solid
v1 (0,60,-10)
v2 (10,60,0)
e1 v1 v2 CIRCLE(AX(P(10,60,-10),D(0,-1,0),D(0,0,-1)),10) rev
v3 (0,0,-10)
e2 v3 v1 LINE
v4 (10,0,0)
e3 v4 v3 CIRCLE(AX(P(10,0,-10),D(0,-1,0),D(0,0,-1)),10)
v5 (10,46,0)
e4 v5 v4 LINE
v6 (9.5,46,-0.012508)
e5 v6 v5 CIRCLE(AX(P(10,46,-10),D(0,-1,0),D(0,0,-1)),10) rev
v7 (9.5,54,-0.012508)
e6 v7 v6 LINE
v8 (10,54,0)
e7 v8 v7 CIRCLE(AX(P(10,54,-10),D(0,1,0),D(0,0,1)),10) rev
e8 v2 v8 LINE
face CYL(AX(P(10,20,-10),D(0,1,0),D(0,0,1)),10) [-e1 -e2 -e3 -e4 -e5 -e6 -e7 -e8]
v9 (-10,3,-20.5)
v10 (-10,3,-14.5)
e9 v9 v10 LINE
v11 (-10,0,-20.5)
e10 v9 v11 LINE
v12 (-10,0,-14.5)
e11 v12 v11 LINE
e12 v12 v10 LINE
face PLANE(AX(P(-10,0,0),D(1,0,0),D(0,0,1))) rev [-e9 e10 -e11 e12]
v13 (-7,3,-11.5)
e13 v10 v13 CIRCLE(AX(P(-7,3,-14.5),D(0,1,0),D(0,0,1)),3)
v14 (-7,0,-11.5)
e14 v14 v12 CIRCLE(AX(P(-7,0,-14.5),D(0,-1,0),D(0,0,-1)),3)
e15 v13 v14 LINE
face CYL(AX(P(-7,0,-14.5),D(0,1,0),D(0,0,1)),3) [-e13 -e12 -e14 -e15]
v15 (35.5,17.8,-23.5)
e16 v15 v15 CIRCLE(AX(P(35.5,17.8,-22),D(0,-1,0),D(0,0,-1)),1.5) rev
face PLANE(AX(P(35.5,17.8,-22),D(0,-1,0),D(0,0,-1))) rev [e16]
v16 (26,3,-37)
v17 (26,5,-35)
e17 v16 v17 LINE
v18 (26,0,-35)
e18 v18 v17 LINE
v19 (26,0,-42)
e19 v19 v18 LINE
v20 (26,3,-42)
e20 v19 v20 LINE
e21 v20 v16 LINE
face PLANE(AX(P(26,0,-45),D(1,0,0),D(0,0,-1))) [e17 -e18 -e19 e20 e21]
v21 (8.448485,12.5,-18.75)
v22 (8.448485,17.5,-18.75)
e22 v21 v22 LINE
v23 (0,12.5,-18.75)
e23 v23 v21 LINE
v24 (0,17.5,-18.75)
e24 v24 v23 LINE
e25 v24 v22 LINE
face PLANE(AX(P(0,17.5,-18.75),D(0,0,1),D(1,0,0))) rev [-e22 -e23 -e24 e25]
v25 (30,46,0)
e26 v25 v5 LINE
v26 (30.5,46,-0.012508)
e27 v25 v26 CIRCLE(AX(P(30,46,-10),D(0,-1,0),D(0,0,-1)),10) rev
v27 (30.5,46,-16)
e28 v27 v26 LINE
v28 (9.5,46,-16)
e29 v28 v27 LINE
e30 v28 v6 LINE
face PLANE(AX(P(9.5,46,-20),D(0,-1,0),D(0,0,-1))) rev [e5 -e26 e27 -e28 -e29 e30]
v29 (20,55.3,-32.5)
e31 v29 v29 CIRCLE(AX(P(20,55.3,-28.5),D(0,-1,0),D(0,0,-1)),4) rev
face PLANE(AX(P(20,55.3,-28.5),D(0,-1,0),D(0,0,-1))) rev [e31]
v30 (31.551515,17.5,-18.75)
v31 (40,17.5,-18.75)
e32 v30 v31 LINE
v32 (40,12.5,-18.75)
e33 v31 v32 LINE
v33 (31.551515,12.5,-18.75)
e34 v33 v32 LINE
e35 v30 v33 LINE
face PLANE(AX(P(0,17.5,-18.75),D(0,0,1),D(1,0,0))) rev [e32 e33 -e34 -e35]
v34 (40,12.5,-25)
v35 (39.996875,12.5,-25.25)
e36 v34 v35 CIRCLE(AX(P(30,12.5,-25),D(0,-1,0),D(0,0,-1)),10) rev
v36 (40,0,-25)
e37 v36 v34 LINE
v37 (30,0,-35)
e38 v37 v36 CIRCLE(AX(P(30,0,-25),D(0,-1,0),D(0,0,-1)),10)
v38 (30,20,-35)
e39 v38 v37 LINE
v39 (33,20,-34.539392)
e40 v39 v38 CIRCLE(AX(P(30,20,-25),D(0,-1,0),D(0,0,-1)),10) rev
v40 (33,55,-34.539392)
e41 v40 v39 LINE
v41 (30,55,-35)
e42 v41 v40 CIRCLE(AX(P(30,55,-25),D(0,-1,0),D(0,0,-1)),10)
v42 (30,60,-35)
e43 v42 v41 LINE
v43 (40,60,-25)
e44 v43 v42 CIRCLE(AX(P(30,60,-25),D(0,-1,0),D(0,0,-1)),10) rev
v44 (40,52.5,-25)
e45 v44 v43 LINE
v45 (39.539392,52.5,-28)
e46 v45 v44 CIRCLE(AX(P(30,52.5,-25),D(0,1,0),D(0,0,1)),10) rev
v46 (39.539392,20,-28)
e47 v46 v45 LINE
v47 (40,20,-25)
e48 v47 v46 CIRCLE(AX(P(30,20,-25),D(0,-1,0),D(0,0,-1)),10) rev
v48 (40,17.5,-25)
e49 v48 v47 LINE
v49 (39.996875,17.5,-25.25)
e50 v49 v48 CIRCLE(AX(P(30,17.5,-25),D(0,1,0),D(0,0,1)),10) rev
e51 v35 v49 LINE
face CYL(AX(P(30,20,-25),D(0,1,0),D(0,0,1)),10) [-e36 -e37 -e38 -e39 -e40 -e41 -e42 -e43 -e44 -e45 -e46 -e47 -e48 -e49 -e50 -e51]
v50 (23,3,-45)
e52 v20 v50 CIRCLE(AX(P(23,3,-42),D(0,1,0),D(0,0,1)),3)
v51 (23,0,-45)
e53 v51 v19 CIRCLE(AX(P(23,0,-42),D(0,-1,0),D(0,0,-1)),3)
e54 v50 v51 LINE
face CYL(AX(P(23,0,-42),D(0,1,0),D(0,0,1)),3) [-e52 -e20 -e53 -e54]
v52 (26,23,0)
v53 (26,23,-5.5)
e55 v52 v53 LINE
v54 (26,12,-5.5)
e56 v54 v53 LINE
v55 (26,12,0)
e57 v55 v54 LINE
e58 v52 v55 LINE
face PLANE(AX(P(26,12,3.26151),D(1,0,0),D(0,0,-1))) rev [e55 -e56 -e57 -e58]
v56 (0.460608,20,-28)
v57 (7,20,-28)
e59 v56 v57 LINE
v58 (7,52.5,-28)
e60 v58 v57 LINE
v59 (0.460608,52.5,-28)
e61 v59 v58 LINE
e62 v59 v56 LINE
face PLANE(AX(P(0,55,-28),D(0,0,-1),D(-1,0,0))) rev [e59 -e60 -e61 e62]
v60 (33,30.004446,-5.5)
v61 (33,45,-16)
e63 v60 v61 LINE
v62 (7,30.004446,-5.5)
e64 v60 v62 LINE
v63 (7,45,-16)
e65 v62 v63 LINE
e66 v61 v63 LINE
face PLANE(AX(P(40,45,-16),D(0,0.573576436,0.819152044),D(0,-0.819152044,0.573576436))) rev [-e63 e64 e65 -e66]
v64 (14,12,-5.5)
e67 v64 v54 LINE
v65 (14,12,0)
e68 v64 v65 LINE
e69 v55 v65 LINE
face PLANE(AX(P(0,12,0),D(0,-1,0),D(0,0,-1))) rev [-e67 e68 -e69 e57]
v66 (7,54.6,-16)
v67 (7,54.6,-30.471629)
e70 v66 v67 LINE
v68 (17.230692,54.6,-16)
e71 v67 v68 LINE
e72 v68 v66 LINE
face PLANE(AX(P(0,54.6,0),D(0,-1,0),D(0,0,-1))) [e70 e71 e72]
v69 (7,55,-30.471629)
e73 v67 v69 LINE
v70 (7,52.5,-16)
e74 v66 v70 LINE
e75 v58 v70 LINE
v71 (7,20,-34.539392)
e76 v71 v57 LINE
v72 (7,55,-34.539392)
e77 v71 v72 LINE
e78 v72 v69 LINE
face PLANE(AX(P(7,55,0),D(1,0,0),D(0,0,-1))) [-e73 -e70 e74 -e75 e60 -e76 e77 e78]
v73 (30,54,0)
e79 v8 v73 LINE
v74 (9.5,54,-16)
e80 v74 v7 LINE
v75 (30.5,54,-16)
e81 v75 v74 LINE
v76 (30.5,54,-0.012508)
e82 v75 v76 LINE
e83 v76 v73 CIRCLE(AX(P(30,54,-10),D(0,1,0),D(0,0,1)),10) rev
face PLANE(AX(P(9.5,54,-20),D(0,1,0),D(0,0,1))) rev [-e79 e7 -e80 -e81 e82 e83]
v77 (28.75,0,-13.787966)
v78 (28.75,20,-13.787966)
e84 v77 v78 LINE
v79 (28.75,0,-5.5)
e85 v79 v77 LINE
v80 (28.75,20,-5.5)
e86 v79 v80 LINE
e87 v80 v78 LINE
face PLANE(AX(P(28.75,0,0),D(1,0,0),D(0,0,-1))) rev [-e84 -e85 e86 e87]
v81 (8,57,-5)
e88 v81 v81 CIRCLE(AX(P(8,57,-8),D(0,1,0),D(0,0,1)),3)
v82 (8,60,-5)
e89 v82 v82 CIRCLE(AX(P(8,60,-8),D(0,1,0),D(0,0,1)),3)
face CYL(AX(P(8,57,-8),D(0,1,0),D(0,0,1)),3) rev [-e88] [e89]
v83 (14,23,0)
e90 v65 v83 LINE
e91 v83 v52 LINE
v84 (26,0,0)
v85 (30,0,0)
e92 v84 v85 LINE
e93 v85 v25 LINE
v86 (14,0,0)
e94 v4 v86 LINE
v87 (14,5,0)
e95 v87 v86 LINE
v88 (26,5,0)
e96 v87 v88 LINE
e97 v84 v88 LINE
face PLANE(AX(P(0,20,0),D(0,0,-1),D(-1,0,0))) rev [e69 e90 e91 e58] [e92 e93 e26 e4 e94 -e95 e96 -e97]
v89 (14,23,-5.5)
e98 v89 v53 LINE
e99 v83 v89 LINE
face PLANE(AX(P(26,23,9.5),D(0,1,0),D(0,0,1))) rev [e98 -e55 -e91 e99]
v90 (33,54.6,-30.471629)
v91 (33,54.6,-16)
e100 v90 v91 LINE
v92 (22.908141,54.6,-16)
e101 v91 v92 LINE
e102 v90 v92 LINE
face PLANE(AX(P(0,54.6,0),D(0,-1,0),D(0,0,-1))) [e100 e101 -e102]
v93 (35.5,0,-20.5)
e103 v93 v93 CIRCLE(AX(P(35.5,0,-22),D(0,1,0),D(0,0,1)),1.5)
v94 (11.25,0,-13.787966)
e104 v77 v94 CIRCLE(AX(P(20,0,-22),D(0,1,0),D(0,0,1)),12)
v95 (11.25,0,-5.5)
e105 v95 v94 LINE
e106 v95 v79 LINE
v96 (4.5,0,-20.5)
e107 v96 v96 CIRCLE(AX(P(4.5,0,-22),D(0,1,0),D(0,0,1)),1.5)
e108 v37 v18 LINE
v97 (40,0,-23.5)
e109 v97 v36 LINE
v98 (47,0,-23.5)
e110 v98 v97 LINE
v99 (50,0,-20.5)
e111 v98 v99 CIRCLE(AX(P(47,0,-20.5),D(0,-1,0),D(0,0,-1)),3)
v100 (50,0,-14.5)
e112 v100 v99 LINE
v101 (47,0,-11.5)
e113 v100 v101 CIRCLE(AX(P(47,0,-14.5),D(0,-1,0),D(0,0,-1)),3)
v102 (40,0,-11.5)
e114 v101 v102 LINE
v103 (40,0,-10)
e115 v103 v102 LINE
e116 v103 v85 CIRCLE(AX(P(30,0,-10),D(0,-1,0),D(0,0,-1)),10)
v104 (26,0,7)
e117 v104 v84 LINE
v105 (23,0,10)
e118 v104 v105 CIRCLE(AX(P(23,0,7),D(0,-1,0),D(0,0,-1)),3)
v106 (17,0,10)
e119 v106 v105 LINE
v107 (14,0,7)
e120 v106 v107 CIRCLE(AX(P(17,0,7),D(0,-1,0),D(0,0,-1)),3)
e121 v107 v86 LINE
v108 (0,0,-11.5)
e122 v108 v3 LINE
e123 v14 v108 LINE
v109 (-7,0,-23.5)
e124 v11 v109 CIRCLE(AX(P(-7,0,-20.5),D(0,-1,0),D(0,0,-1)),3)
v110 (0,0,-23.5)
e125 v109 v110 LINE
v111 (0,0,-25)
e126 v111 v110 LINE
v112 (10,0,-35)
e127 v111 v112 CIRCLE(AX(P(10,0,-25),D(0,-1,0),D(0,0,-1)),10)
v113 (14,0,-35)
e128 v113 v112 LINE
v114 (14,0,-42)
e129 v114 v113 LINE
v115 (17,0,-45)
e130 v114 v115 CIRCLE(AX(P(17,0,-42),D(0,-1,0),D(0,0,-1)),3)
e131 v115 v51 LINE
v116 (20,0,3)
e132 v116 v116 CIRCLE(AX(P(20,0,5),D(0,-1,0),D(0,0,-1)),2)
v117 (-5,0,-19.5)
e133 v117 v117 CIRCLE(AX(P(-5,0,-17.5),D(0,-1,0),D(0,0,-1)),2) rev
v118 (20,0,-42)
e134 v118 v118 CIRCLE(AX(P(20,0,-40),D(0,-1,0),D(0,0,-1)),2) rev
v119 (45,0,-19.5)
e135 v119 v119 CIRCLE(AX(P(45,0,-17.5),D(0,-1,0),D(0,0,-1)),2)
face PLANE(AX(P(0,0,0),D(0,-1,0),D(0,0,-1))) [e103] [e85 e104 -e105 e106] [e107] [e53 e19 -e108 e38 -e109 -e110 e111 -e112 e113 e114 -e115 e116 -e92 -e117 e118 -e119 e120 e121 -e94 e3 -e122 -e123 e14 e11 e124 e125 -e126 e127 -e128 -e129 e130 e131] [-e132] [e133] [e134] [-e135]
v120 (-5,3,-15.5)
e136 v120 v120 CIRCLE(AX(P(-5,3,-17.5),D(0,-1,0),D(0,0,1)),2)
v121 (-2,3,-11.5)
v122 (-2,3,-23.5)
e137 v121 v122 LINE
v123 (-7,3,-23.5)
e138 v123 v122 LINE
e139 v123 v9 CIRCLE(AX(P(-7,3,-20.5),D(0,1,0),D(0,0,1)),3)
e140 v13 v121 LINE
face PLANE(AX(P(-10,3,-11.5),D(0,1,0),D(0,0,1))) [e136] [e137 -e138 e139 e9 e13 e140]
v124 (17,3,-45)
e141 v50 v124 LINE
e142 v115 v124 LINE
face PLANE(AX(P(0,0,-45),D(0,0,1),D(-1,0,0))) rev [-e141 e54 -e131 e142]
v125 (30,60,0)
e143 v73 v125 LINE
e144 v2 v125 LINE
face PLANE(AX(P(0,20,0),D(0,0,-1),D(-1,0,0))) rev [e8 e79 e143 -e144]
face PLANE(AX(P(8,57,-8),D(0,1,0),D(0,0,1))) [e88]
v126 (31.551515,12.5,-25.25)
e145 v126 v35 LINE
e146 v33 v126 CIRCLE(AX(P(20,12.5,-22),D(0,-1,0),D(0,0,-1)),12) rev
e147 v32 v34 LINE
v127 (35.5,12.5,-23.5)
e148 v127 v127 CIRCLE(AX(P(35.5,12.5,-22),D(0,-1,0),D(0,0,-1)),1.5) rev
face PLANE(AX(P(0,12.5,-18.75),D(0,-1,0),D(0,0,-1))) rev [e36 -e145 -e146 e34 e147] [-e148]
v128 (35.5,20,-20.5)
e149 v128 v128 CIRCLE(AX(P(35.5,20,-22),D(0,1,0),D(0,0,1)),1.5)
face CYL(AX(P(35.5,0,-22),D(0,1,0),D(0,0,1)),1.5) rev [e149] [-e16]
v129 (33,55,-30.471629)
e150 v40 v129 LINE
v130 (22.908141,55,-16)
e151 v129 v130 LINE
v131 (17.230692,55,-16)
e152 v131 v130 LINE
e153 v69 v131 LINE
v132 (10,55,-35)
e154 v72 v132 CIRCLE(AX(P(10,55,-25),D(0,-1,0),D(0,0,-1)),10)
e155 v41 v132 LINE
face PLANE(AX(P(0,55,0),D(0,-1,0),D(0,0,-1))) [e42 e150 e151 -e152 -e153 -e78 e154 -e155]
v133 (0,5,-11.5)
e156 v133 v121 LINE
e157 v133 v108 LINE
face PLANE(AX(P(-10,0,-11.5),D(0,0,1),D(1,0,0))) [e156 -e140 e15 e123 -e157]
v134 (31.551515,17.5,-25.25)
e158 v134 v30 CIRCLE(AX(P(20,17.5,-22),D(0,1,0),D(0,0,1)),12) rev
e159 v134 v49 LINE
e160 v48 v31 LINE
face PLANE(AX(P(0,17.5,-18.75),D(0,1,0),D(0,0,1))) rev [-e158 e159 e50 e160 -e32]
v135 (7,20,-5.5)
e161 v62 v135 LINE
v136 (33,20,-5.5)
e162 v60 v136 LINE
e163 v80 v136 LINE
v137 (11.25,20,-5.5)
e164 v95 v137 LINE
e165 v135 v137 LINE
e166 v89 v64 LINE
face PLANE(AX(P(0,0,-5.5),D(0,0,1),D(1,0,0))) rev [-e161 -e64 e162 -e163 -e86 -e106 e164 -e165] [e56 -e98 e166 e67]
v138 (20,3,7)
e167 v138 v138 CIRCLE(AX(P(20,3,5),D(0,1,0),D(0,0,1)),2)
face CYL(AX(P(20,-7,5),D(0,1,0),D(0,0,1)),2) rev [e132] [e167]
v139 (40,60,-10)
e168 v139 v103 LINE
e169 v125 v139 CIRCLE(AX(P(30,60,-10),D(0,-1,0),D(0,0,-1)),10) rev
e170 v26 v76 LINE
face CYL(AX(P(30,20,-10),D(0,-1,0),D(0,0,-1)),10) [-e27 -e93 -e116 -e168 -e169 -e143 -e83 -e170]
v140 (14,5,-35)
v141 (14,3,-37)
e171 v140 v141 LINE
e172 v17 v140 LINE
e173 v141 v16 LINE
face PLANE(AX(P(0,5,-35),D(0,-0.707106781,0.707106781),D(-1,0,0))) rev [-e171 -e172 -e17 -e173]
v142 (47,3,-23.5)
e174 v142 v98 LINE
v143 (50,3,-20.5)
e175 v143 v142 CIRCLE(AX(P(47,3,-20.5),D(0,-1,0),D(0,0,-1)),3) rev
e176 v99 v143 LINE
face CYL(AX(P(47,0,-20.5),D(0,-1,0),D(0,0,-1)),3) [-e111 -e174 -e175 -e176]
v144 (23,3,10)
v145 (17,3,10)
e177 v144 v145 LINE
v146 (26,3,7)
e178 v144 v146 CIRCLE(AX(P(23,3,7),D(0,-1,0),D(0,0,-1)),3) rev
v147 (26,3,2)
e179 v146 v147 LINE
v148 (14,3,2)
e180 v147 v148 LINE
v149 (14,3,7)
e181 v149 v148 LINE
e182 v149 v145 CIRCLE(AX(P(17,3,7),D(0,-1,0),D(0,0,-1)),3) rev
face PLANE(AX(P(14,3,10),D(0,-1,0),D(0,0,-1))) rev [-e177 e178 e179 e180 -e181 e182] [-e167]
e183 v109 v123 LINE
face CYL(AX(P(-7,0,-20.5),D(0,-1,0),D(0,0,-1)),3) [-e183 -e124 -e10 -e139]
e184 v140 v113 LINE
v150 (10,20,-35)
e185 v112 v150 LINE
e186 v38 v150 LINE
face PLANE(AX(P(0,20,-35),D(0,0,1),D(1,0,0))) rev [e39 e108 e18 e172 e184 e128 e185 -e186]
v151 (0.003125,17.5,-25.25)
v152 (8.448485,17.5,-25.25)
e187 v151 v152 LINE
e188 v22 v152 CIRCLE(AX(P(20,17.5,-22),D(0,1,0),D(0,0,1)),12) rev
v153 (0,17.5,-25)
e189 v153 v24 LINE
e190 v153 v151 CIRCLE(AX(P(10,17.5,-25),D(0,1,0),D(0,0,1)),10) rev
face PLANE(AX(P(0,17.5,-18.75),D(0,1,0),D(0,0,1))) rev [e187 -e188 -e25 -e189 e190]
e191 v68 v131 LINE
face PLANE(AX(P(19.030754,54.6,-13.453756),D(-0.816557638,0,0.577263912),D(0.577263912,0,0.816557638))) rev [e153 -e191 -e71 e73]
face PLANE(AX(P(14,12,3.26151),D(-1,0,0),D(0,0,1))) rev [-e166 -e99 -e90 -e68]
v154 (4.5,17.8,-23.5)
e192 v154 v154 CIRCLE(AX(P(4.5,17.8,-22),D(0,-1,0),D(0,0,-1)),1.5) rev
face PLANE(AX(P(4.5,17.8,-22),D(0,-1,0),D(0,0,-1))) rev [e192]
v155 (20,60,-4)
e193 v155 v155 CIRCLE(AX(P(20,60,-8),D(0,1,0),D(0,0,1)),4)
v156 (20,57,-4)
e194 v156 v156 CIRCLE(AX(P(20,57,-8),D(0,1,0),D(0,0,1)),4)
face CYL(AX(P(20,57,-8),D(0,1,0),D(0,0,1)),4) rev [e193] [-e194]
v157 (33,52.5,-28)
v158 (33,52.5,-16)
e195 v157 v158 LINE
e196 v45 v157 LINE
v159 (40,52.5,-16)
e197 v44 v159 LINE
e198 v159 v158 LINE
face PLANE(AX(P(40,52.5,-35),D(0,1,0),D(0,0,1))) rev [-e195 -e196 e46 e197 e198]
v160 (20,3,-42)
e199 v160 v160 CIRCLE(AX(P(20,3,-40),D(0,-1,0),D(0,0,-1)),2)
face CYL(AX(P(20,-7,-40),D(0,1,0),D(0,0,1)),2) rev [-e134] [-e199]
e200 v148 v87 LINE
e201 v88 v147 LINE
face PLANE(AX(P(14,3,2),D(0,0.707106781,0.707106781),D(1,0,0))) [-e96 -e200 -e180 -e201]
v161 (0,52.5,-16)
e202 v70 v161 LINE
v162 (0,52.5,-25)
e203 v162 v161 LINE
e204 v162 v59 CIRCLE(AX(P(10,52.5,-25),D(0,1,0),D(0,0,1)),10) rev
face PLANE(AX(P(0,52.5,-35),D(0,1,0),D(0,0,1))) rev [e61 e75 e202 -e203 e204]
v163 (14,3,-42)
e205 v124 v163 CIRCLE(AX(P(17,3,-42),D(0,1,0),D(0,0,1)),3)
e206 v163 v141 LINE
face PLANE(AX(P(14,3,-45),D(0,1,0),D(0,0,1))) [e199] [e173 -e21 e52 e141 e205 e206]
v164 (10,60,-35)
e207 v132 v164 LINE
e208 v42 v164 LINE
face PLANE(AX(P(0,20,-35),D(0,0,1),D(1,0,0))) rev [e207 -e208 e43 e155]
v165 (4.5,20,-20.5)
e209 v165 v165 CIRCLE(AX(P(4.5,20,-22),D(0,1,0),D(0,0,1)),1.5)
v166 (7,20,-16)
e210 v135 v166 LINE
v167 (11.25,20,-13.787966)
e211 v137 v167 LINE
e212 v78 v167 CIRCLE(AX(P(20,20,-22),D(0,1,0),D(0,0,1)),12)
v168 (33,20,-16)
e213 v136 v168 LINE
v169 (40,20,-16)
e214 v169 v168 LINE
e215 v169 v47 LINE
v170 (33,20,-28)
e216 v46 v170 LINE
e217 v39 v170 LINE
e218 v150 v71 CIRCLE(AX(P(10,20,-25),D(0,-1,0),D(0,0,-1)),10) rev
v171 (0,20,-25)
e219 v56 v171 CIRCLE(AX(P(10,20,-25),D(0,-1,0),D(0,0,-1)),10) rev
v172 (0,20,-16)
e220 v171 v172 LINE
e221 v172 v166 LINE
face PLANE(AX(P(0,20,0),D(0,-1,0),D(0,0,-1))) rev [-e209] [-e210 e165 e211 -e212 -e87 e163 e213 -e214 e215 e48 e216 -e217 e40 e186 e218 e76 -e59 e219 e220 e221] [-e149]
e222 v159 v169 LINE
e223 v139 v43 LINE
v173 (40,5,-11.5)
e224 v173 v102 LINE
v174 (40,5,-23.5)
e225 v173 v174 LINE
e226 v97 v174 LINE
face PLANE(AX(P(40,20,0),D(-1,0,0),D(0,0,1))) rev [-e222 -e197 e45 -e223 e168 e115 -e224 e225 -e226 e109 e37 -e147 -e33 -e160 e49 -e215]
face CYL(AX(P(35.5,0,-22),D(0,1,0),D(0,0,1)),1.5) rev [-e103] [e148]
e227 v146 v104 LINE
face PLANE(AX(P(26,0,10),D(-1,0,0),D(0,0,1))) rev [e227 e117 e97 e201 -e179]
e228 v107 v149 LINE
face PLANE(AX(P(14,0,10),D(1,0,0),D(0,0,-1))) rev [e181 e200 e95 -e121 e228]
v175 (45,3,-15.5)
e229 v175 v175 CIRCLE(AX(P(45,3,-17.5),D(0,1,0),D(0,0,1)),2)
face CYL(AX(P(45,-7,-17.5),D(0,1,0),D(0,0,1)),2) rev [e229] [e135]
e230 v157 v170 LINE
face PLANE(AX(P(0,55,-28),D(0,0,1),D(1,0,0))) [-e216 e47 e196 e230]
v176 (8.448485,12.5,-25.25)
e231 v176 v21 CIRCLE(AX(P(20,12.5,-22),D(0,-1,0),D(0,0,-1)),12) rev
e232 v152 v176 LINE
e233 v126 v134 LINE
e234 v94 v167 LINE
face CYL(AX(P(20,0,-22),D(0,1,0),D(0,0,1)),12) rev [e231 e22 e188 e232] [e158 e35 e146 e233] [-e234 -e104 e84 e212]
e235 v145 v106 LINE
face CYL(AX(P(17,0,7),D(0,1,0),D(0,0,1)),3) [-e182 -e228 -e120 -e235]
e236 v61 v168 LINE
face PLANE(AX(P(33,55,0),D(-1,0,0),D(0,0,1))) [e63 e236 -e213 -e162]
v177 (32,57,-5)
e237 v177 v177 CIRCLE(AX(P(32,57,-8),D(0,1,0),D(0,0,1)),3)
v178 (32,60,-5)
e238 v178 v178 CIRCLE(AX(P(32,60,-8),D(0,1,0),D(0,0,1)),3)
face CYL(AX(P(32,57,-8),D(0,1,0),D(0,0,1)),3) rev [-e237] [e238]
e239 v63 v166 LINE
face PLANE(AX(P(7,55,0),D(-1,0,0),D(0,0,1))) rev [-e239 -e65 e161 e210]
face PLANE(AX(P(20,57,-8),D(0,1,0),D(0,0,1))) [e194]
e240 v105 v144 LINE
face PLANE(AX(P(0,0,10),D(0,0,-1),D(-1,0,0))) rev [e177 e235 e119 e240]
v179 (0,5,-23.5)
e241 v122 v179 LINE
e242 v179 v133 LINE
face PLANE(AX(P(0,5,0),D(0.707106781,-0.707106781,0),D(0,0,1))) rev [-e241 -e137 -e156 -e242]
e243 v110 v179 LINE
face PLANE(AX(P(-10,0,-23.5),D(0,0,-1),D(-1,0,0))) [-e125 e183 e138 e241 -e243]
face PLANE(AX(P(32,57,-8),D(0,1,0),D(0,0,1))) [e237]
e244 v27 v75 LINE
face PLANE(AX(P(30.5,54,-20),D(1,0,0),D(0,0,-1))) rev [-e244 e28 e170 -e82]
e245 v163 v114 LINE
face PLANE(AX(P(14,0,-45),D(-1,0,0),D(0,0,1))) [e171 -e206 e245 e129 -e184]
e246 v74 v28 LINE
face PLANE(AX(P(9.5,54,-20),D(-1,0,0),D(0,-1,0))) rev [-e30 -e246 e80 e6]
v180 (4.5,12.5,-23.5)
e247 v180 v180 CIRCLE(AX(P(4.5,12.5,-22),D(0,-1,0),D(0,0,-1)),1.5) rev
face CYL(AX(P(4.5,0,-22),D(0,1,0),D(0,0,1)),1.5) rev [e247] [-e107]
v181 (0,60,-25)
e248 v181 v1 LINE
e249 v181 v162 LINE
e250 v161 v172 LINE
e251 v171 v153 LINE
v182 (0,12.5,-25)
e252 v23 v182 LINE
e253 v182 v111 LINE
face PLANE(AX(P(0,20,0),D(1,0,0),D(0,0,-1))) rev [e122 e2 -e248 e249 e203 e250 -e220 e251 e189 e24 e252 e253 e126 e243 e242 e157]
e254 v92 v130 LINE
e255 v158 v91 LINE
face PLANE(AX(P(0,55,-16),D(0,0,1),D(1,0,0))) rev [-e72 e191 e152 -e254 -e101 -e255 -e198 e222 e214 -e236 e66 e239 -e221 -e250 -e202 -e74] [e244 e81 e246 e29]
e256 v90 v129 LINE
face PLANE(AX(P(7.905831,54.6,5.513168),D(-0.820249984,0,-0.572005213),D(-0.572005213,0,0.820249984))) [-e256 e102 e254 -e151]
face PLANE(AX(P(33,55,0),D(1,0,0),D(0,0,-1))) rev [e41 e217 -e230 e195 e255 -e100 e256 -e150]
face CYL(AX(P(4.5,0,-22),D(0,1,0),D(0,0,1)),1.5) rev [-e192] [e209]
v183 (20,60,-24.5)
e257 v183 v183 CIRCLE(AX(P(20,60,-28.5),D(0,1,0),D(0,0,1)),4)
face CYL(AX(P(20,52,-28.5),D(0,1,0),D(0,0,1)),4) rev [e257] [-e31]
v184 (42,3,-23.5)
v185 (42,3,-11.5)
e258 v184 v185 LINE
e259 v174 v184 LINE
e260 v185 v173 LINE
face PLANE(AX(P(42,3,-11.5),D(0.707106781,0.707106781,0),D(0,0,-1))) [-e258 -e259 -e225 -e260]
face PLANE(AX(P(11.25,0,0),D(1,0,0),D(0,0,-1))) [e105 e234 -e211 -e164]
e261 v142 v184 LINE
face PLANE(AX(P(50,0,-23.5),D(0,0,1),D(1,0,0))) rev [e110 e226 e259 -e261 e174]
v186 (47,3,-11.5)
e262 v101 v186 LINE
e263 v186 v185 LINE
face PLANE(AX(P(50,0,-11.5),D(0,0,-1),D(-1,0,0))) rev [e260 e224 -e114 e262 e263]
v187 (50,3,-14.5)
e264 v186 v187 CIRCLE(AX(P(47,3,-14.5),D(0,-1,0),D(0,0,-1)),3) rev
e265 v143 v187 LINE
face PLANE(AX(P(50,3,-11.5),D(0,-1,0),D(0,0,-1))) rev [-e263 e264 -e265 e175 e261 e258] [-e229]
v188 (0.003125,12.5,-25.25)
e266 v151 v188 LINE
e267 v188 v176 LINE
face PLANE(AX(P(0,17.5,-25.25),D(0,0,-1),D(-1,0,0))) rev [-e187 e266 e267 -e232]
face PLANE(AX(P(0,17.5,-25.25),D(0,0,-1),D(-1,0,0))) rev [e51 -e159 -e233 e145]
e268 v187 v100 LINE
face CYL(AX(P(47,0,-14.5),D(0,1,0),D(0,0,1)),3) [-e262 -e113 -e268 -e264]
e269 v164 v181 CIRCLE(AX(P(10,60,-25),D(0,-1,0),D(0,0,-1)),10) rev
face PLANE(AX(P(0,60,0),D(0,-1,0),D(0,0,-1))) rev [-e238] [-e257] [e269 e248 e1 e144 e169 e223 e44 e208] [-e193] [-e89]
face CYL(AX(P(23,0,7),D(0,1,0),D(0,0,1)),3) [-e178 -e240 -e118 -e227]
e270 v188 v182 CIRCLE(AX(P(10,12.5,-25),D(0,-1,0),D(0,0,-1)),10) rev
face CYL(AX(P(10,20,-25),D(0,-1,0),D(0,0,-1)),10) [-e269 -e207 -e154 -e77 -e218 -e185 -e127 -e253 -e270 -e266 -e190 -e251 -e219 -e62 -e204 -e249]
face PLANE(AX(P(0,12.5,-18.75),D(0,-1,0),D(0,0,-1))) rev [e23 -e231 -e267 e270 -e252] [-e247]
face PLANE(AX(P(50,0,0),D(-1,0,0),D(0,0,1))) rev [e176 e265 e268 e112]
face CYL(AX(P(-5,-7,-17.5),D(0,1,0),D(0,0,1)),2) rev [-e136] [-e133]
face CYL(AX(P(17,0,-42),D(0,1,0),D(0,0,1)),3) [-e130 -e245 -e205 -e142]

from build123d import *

# Parameters (mm, degrees)
ESBO_O2_W                                     = 40
ESBO_O2_H                                     = 35
BASE_DEPTH                                    = 20
ESBO_O3_R                                     = 12
ESBO_O3_W                                     = 17.5
ESBO_O3_H                                     = 9
FURO_DO_ENCAIXE_DO_MOTOR_DEPTH                = 57.789083458
ESBO_O5_R                                     = 1.5
FURO_DOS_PARAFUSOS_DO_MOTOR_DEPTH             = 57.789083458
ESBO_O6_W                                     = 6.5
ESBO_O6_H                                     = 5
FURO_DA_ARRUELA_PARA_PARAFUSOS_DO_MOTOR_DEPTH = 57.789083458
ESBO_O7_W                                     = 12
ESBO_O7_H                                     = 21.613382206
CALHA_PARA_OS_CABOS_DO_MOTOR_DEPTH            = 8
ESBO_O10_W                                    = 7
ESBO_O10_H                                    = 10.5
ESBO_O10_W_2                                  = 12
ESBO_O10_H_2                                  = 5.5
ESBO_O10_H_3                                  = 7
BASE_EXTENDIDA_DEPTH                          = 35
CHANFRO_DA_BASE_EXTENDIDA_REACH               = 75.068
PONTE_1_REACH                                 = 72.612
ESBO_O12_W                                    = 7
ESBO_O12_H                                    = 2.5
PONTE_2_REACH                                 = 72.612
ESBO_O13_W                                    = 7
ESBO_O13_H                                    = 2.5
ESBO_O14_W                                    = 40
ESBO_O14_H                                    = 35
TELHADO_DEPTH                                 = 5
ESBO_O18_R                                    = 4
FURO_DO_EIXO_DEPTH                            = 8
ESBO_O20_W                                    = 12
ESBO_O20_H                                    = 6
CALHA_PARA_OS_CABOS_DO_MOTOR_SUPERIOR_DEPTH   = 15
CAMA_START                                    = -0.3
ESBO_O21_R                                    = 1.5
CAMA_FURO_DO_PARAFUSO_1_DEPTH                 = 0.3
ESBO_O22_R                                    = 1.5
CAMA_FURO_DO_PARAFUSO_2_DEPTH                 = 0.3
CAMA_PARA_O_TELHADO_DEPTH                     = 0.4
ESBO_O24_R                                    = 4
CAMA_PARA_O_FURO_DO_EIXO_DEPTH                = 0.3
FILETE1_R                                     = 10
FILETE2_R                                     = 10
FILETE3_R                                     = 10
FILETE4_R                                     = 10
ESBO_O26_W                                    = 21
ESBO_O26_H                                    = 8
CORTE_EXTRUS_O1_DEPTH                         = 20
ESBO_O28_W                                    = 12
ESBO_O28_H                                    = 3
RESSALTO_EXTRUS_O11_DEPTH                     = 10
ESBO_O29_R                                    = 2
CORTE_EXTRUS_O2_DEPTH                         = 10
ESBO_O30_W                                    = 12
ESBO_O30_H                                    = 3
RESSALTO_EXTRUS_O12_DEPTH                     = 10
ESBO_O31_R                                    = 2
CORTE_EXTRUS_O3_DEPTH                         = 10
CHANFRO1_SIZE                                 = 2
CHANFRO2_SIZE                                 = 2
CHANFRO3_SIZE                                 = 2
FILETE5_R                                     = 3
FILETE6_R                                     = 3
FILETE7_R                                     = 3
FILETE8_R                                     = 3
FILETE9_R                                     = 3
FILETE10_R                                    = 3
FILETE7_OF_ESPELHAR5_R                        = 3
FILETE8_OF_ESPELHAR5_R                        = 3
CHANFRO4_SIZE                                 = 2
ESBO_O32_R                                    = 4
ESBO_O32_R_2                                  = 3
CORTE_EXTRUS_O4_DEPTH                         = 3


with BuildPart() as part:
    # Esboço2 → Base (new body)
    with BuildSketch(Plane(origin=(0, 0, 0), x_dir=(1, 0, 0), z_dir=(0, 1, 0))):
        with Locations((20, 17.5)):
            Rectangle(ESBO_O2_W, ESBO_O2_H)
    extrude(amount=BASE_DEPTH)

    # Esboço3 → Furo do encaixe do motor (cut, through all)
    with BuildSketch(Plane(origin=(0, 20, 0), x_dir=(1, 0, 0), z_dir=(0, 1, 0))):
        with Locations((20, 22)):
            Circle(ESBO_O3_R)
        with Locations((20, 10)):
            Rectangle(ESBO_O3_W, ESBO_O3_H)
    extrude(amount=-FURO_DO_ENCAIXE_DO_MOTOR_DEPTH, mode=Mode.SUBTRACT)

    # Esboço5 → Furo dos parafusos do motor (cut, through all)
    with BuildSketch(Plane(origin=(0, 20, 0), x_dir=(1, 0, 0), z_dir=(0, 1, 0))):
        with Locations(Location((4.5, 22, 0), (0, 0, 270))):
            Circle(ESBO_O5_R)
        with Locations(Location((35.5, 22, 0), (0, 0, 270))):
            Circle(ESBO_O5_R)
    extrude(amount=-FURO_DOS_PARAFUSOS_DO_MOTOR_DEPTH, mode=Mode.SUBTRACT)

    # Esboço6 → Furo da arruela para parafusos do motor (cut, through all)
    with BuildSketch(Plane(origin=(40, 0, 0), x_dir=(0, 0, -1), z_dir=(1, 0, 0))):
        with Locations((22, 15)):
            Rectangle(ESBO_O6_W, ESBO_O6_H)
    extrude(amount=-FURO_DA_ARRUELA_PARA_PARAFUSOS_DO_MOTOR_DEPTH, mode=Mode.SUBTRACT)

    # Esboço7 → Calha para os cabos do motor (cut)
    with BuildSketch(Plane(origin=(0, 20, 0), x_dir=(1, 0, 0), z_dir=(0, 1, 0))):
        with Locations((20, 7.545181244)):
            Rectangle(ESBO_O7_W, ESBO_O7_H)
    extrude(amount=-CALHA_PARA_OS_CABOS_DO_MOTOR_DEPTH, mode=Mode.SUBTRACT)

    # Esboço10 → Base extendida (add)
    with BuildSketch(Plane(origin=(0, 20, 0), x_dir=(1, 0, 0), z_dir=(0, 1, 0))):
        with Locations((3.5, 10.75)):
            Rectangle(ESBO_O10_W, ESBO_O10_H)
        Polygon((7, 5.5), (0, 5.5), (0, 0), (14, 0), (14, 5.5), (11.25, 5.5), align=None)
        Polygon((40, 0), (40, 5.5), (33, 5.5), (28.75, 5.5), (26, 5.5), (26, 0), align=None)
        with Locations((20, 2.75)):
            Rectangle(ESBO_O10_W_2, ESBO_O10_H_2)
        with Locations((36.5, 10.75)):
            Rectangle(ESBO_O10_W, ESBO_O10_H)
        with Locations((36.5, 31.5)):
            Rectangle(ESBO_O10_W, ESBO_O10_H_3)
        with Locations((3.5, 31.5)):
            Rectangle(ESBO_O10_W, ESBO_O10_H_3)
    extrude(amount=BASE_EXTENDIDA_DEPTH)

    # Esboço11 → Chanfro da base extendida (add, up to next)
    with BuildSketch(Plane(origin=(7, 0, 0), x_dir=(0, 0, -1), z_dir=(1, 0, 0)), mode=Mode.PRIVATE) as chanfro_da_base_extendida_sk1:
        Polygon((16, 55), (16, 45), (5.5, 30.004445929), (5.5, 55), align=None)
    chanfro_da_base_extendida_tool1 = extrude(chanfro_da_base_extendida_sk1.sketch, amount=CHANFRO_DA_BASE_EXTENDIDA_REACH, mode=Mode.PRIVATE) - part.part
    add(chanfro_da_base_extendida_tool1.solids().sort_by_distance((7, 45.715647, -10.000127))[0])

    # Esboço12 → Ponte 1 (add, up to next)
    with BuildSketch(Plane(origin=(0, 0, -16), x_dir=(-1, 0, 0), z_dir=(0, 0, -1)), mode=Mode.PRIVATE) as ponte_1_sk1:
        with Locations((-36.5, 53.75)):
            Rectangle(ESBO_O12_W, ESBO_O12_H)
    ponte_1_tool1 = extrude(ponte_1_sk1.sketch, amount=PONTE_1_REACH, mode=Mode.PRIVATE) - part.part
    add(ponte_1_tool1.solids().sort_by_distance((36.5, 53.75, -16))[0])

    # Esboço13 → Ponte 2 (add, up to next)
    with BuildSketch(Plane(origin=(0, 0, -16), x_dir=(-1, 0, 0), z_dir=(0, 0, -1)), mode=Mode.PRIVATE) as ponte_2_sk1:
        with Locations((-3.5, 53.75)):
            Rectangle(ESBO_O13_W, ESBO_O13_H)
    ponte_2_tool1 = extrude(ponte_2_sk1.sketch, amount=PONTE_2_REACH, mode=Mode.PRIVATE) - part.part
    add(ponte_2_tool1.solids().sort_by_distance((3.5, 53.75, -16))[0])

    # Esboço14 → Telhado (add)
    with BuildSketch(Plane(origin=(0, 55, 0), x_dir=(1, 0, 0), z_dir=(0, 1, 0))):
        with Locations((20, 17.5)):
            Rectangle(ESBO_O14_W, ESBO_O14_H)
    extrude(amount=TELHADO_DEPTH)

    # Esboço18 → Furo do Eixo (cut)
    with BuildSketch(Plane(origin=(0, 60, 0), x_dir=(1, 0, 0), z_dir=(0, 1, 0))):
        with Locations(Location((20, 28.5, 0), (0, 0, 270))):
            Circle(ESBO_O18_R)
    extrude(amount=-FURO_DO_EIXO_DEPTH, mode=Mode.SUBTRACT)

    # Esboço20 → Calha para os cabos do motor superior (cut)
    with BuildSketch(Plane(origin=(0, 0, -5.5), x_dir=(-1, 0, 0), z_dir=(0, 0, -1))):
        with Locations((-20, 20)):
            Rectangle(ESBO_O20_W, ESBO_O20_H)
    extrude(amount=-CALHA_PARA_OS_CABOS_DO_MOTOR_SUPERIOR_DEPTH, mode=Mode.SUBTRACT)

    # Esboço21 → Cama furo do parafuso 1 (add)
    with BuildSketch(Plane.XZ.offset(-17.5).offset(CAMA_START)):
        with Locations(Location((35.5, -22, 0), (0, 0, 90))):
            Circle(ESBO_O21_R)
    extrude(amount=CAMA_FURO_DO_PARAFUSO_1_DEPTH)

    # Esboço22 → Cama furo do parafuso 2 (add)
    with BuildSketch(Plane.XZ.offset(-17.5).offset(CAMA_START)):
        with Locations(Location((4.5, -22, 0), (0, 0, 90))):
            Circle(ESBO_O22_R)
    extrude(amount=CAMA_FURO_DO_PARAFUSO_2_DEPTH)

    # Esboço23 → Cama para o telhado (add)
    with BuildSketch(Plane.XZ.offset(-55)):
        Polygon((22.908140654, -16), (33, -30.471629423), (33, -16), align=None)
        Polygon((7, -16), (7, -30.471629423), (17.230691655, -16), align=None)
    extrude(amount=CAMA_PARA_O_TELHADO_DEPTH)

    # Esboço24 → Cama para o furo do eixo (add)
    with BuildSketch(Plane.XZ.offset(-55).offset(CAMA_START)):
        with Locations(Location((20, -28.5, 0), (0, 0, 90))):
            Circle(ESBO_O24_R)
    extrude(amount=CAMA_PARA_O_FURO_DO_EIXO_DEPTH)

    # Filete1
    # the kernel refuses this fillet: 10 mm, written as the material it takes off along each edge
    with BuildSketch(Plane(origin=(40, -25, -35), x_dir=(0, 0, 1), z_dir=(0, 1, 0))) as filete1_piece_1:
        with BuildLine():
            CenterArc((FILETE1_R, -FILETE1_R), FILETE1_R, 90, 90)
            Line((0, -FILETE1_R), (0, 0))
            Line((0, 0), (FILETE1_R, 0))
        make_face()
    extrude(amount=110, mode=Mode.SUBTRACT)

    # Filete2
    # the kernel refuses this fillet: 10 mm, written as the material it takes off along each edge
    with BuildSketch(Plane(origin=(0, 85, -35), x_dir=(0, 0, 1), z_dir=(0, -1, 0))) as filete2_piece_1:
        with BuildLine():
            CenterArc((FILETE2_R, -FILETE2_R), FILETE2_R, 90, 90)
            Line((0, -FILETE2_R), (0, 0))
            Line((0, 0), (FILETE2_R, 0))
        make_face()
    extrude(amount=110, mode=Mode.SUBTRACT)

    # Filete3
    filete3_edges = [part.edges().sort_by_distance(p)[0] for p in [
        (0, 30, 0),
    ]]
    fillet(filete3_edges, radius=FILETE3_R)

    # Filete4
    filete4_edges = [part.edges().sort_by_distance(p)[0] for p in [
        (40, 30, 0),
    ]]
    fillet(filete4_edges, radius=FILETE4_R)

    # Esboço26 → Corte-extrusão1 (cut)
    with BuildSketch(Plane.XY):
        with Locations((20, 50)):
            Rectangle(ESBO_O26_W, ESBO_O26_H)
    extrude(amount=-CORTE_EXTRUS_O1_DEPTH, mode=Mode.SUBTRACT)

    # Esboço28 → Ressalto-extrusão11 (add)
    with BuildSketch(Plane(origin=(40, 0, 0), x_dir=(0, 0, -1), z_dir=(1, 0, 0))):
        with Locations((17.5, 1.5)):
            Rectangle(ESBO_O28_W, ESBO_O28_H)
    ressalto_extrus_o11 = extrude(amount=RESSALTO_EXTRUS_O11_DEPTH)

    # Esboço29 → Corte-extrusão2 (cut)
    with BuildSketch(Plane(origin=(0, 3, 0), x_dir=(1, 0, 0), z_dir=(0, 1, 0))):
        with Locations(Location((45, 17.5, 0), (0, 0, 270))):
            Circle(ESBO_O29_R)
    corte_extrus_o2 = extrude(amount=-CORTE_EXTRUS_O2_DEPTH, mode=Mode.SUBTRACT)

    # Espelhar1: Ressalto-extrusão11 across plane
    add(ressalto_extrus_o11.mirror(Plane(origin=(20, 0, 0), x_dir=(0, 0, 1), z_dir=(1, 0, 0))))

    # Espelhar2: Corte-extrusão2 across plane
    add(corte_extrus_o2.mirror(Plane(origin=(20, 0, 0), x_dir=(0, 0, 1), z_dir=(1, 0, 0))), mode=Mode.SUBTRACT)

    # Esboço30 → Ressalto-extrusão12 (add)
    with BuildSketch(Plane.XY):
        with Locations((20, 1.5)):
            Rectangle(ESBO_O30_W, ESBO_O30_H)
    ressalto_extrus_o12 = extrude(amount=RESSALTO_EXTRUS_O12_DEPTH)

    # Esboço31 → Corte-extrusão3 (cut)
    with BuildSketch(Plane(origin=(0, 3, 0), x_dir=(1, 0, 0), z_dir=(0, 1, 0))):
        with Locations(Location((20, -5, 0), (0, 0, 270))):
            Circle(ESBO_O31_R)
    corte_extrus_o3 = extrude(amount=-CORTE_EXTRUS_O3_DEPTH, mode=Mode.SUBTRACT)

    # Chanfro1
    chanfro1_edges = [part.edges().sort_by_distance(p)[0] for p in [
        (40, 3, -17.5),
    ]]
    chamfer(chanfro1_edges, length=CHANFRO1_SIZE)

    # Chanfro2
    chanfro2_edges = [part.edges().sort_by_distance(p)[0] for p in [
        (0, 3, -17.5),
    ]]
    chamfer(chanfro2_edges, length=CHANFRO2_SIZE)

    # Chanfro3
    chanfro3_edges = [part.edges().sort_by_distance(p)[0] for p in [
        (20, 3, 0),
    ]]
    chamfer(chanfro3_edges, length=CHANFRO3_SIZE)

    # Filete5
    filete5_edges = [part.edges().sort_by_distance(p)[0] for p in [
        (50, 1.5, -11.5),
    ]]
    fillet(filete5_edges, radius=FILETE5_R)

    # Filete6
    filete6_edges = [part.edges().sort_by_distance(p)[0] for p in [
        (50, 1.5, -23.5),
    ]]
    fillet(filete6_edges, radius=FILETE6_R)

    # Filete7
    filete7_edges = [part.edges().sort_by_distance(p)[0] for p in [
        (26, 1.5, 10),
    ]]
    fillet(filete7_edges, radius=FILETE7_R)

    # Filete8
    filete8_edges = [part.edges().sort_by_distance(p)[0] for p in [
        (14, 1.5, 10),
    ]]
    fillet(filete8_edges, radius=FILETE8_R)

    # Filete9
    filete9_edges = [part.edges().sort_by_distance(p)[0] for p in [
        (-10, 1.5, -11.5),
    ]]
    fillet(filete9_edges, radius=FILETE9_R)

    # Filete10
    filete10_edges = [part.edges().sort_by_distance(p)[0] for p in [
        (-10, 1.5, -23.5),
    ]]
    fillet(filete10_edges, radius=FILETE10_R)

    # Espelhar5: Ressalto-extrusão12, Corte-extrusão3 across plane
    add(ressalto_extrus_o12.mirror(Plane.XY.offset(-17.5)))
    add(corte_extrus_o3.mirror(Plane.XY.offset(-17.5)), mode=Mode.SUBTRACT)

    # Filete7 of Espelhar5
    filete7_of_espelhar5_edges = [part.edges().sort_by_distance(p)[0] for p in [
        (26, 1.5, -45),
    ]]
    fillet(filete7_of_espelhar5_edges, radius=FILETE7_OF_ESPELHAR5_R)

    # Filete8 of Espelhar5
    filete8_of_espelhar5_edges = [part.edges().sort_by_distance(p)[0] for p in [
        (14, 1.5, -45),
    ]]
    fillet(filete8_of_espelhar5_edges, radius=FILETE8_OF_ESPELHAR5_R)

    # Chanfro4
    chanfro4_edges = [part.edges().sort_by_distance(p)[0] for p in [
        (20, 3, -35),
    ]]
    chamfer(chanfro4_edges, length=CHANFRO4_SIZE)

    # Esboço32 → Corte-extrusão4 (cut)
    with BuildSketch(Plane(origin=(0, 60, 0), x_dir=(1, 0, 0), z_dir=(0, 1, 0))):
        with Locations(Location((20, 8, 0), (0, 0, 270))):
            Circle(ESBO_O32_R)
        with Locations(Location((8, 8, 0), (0, 0, 270))):
            Circle(ESBO_O32_R_2)
        with Locations(Location((32, 8, 0), (0, 0, 270))):
            Circle(ESBO_O32_R_2)
    extrude(amount=-CORTE_EXTRUS_O4_DEPTH, mode=Mode.SUBTRACT)


solid = part.part
